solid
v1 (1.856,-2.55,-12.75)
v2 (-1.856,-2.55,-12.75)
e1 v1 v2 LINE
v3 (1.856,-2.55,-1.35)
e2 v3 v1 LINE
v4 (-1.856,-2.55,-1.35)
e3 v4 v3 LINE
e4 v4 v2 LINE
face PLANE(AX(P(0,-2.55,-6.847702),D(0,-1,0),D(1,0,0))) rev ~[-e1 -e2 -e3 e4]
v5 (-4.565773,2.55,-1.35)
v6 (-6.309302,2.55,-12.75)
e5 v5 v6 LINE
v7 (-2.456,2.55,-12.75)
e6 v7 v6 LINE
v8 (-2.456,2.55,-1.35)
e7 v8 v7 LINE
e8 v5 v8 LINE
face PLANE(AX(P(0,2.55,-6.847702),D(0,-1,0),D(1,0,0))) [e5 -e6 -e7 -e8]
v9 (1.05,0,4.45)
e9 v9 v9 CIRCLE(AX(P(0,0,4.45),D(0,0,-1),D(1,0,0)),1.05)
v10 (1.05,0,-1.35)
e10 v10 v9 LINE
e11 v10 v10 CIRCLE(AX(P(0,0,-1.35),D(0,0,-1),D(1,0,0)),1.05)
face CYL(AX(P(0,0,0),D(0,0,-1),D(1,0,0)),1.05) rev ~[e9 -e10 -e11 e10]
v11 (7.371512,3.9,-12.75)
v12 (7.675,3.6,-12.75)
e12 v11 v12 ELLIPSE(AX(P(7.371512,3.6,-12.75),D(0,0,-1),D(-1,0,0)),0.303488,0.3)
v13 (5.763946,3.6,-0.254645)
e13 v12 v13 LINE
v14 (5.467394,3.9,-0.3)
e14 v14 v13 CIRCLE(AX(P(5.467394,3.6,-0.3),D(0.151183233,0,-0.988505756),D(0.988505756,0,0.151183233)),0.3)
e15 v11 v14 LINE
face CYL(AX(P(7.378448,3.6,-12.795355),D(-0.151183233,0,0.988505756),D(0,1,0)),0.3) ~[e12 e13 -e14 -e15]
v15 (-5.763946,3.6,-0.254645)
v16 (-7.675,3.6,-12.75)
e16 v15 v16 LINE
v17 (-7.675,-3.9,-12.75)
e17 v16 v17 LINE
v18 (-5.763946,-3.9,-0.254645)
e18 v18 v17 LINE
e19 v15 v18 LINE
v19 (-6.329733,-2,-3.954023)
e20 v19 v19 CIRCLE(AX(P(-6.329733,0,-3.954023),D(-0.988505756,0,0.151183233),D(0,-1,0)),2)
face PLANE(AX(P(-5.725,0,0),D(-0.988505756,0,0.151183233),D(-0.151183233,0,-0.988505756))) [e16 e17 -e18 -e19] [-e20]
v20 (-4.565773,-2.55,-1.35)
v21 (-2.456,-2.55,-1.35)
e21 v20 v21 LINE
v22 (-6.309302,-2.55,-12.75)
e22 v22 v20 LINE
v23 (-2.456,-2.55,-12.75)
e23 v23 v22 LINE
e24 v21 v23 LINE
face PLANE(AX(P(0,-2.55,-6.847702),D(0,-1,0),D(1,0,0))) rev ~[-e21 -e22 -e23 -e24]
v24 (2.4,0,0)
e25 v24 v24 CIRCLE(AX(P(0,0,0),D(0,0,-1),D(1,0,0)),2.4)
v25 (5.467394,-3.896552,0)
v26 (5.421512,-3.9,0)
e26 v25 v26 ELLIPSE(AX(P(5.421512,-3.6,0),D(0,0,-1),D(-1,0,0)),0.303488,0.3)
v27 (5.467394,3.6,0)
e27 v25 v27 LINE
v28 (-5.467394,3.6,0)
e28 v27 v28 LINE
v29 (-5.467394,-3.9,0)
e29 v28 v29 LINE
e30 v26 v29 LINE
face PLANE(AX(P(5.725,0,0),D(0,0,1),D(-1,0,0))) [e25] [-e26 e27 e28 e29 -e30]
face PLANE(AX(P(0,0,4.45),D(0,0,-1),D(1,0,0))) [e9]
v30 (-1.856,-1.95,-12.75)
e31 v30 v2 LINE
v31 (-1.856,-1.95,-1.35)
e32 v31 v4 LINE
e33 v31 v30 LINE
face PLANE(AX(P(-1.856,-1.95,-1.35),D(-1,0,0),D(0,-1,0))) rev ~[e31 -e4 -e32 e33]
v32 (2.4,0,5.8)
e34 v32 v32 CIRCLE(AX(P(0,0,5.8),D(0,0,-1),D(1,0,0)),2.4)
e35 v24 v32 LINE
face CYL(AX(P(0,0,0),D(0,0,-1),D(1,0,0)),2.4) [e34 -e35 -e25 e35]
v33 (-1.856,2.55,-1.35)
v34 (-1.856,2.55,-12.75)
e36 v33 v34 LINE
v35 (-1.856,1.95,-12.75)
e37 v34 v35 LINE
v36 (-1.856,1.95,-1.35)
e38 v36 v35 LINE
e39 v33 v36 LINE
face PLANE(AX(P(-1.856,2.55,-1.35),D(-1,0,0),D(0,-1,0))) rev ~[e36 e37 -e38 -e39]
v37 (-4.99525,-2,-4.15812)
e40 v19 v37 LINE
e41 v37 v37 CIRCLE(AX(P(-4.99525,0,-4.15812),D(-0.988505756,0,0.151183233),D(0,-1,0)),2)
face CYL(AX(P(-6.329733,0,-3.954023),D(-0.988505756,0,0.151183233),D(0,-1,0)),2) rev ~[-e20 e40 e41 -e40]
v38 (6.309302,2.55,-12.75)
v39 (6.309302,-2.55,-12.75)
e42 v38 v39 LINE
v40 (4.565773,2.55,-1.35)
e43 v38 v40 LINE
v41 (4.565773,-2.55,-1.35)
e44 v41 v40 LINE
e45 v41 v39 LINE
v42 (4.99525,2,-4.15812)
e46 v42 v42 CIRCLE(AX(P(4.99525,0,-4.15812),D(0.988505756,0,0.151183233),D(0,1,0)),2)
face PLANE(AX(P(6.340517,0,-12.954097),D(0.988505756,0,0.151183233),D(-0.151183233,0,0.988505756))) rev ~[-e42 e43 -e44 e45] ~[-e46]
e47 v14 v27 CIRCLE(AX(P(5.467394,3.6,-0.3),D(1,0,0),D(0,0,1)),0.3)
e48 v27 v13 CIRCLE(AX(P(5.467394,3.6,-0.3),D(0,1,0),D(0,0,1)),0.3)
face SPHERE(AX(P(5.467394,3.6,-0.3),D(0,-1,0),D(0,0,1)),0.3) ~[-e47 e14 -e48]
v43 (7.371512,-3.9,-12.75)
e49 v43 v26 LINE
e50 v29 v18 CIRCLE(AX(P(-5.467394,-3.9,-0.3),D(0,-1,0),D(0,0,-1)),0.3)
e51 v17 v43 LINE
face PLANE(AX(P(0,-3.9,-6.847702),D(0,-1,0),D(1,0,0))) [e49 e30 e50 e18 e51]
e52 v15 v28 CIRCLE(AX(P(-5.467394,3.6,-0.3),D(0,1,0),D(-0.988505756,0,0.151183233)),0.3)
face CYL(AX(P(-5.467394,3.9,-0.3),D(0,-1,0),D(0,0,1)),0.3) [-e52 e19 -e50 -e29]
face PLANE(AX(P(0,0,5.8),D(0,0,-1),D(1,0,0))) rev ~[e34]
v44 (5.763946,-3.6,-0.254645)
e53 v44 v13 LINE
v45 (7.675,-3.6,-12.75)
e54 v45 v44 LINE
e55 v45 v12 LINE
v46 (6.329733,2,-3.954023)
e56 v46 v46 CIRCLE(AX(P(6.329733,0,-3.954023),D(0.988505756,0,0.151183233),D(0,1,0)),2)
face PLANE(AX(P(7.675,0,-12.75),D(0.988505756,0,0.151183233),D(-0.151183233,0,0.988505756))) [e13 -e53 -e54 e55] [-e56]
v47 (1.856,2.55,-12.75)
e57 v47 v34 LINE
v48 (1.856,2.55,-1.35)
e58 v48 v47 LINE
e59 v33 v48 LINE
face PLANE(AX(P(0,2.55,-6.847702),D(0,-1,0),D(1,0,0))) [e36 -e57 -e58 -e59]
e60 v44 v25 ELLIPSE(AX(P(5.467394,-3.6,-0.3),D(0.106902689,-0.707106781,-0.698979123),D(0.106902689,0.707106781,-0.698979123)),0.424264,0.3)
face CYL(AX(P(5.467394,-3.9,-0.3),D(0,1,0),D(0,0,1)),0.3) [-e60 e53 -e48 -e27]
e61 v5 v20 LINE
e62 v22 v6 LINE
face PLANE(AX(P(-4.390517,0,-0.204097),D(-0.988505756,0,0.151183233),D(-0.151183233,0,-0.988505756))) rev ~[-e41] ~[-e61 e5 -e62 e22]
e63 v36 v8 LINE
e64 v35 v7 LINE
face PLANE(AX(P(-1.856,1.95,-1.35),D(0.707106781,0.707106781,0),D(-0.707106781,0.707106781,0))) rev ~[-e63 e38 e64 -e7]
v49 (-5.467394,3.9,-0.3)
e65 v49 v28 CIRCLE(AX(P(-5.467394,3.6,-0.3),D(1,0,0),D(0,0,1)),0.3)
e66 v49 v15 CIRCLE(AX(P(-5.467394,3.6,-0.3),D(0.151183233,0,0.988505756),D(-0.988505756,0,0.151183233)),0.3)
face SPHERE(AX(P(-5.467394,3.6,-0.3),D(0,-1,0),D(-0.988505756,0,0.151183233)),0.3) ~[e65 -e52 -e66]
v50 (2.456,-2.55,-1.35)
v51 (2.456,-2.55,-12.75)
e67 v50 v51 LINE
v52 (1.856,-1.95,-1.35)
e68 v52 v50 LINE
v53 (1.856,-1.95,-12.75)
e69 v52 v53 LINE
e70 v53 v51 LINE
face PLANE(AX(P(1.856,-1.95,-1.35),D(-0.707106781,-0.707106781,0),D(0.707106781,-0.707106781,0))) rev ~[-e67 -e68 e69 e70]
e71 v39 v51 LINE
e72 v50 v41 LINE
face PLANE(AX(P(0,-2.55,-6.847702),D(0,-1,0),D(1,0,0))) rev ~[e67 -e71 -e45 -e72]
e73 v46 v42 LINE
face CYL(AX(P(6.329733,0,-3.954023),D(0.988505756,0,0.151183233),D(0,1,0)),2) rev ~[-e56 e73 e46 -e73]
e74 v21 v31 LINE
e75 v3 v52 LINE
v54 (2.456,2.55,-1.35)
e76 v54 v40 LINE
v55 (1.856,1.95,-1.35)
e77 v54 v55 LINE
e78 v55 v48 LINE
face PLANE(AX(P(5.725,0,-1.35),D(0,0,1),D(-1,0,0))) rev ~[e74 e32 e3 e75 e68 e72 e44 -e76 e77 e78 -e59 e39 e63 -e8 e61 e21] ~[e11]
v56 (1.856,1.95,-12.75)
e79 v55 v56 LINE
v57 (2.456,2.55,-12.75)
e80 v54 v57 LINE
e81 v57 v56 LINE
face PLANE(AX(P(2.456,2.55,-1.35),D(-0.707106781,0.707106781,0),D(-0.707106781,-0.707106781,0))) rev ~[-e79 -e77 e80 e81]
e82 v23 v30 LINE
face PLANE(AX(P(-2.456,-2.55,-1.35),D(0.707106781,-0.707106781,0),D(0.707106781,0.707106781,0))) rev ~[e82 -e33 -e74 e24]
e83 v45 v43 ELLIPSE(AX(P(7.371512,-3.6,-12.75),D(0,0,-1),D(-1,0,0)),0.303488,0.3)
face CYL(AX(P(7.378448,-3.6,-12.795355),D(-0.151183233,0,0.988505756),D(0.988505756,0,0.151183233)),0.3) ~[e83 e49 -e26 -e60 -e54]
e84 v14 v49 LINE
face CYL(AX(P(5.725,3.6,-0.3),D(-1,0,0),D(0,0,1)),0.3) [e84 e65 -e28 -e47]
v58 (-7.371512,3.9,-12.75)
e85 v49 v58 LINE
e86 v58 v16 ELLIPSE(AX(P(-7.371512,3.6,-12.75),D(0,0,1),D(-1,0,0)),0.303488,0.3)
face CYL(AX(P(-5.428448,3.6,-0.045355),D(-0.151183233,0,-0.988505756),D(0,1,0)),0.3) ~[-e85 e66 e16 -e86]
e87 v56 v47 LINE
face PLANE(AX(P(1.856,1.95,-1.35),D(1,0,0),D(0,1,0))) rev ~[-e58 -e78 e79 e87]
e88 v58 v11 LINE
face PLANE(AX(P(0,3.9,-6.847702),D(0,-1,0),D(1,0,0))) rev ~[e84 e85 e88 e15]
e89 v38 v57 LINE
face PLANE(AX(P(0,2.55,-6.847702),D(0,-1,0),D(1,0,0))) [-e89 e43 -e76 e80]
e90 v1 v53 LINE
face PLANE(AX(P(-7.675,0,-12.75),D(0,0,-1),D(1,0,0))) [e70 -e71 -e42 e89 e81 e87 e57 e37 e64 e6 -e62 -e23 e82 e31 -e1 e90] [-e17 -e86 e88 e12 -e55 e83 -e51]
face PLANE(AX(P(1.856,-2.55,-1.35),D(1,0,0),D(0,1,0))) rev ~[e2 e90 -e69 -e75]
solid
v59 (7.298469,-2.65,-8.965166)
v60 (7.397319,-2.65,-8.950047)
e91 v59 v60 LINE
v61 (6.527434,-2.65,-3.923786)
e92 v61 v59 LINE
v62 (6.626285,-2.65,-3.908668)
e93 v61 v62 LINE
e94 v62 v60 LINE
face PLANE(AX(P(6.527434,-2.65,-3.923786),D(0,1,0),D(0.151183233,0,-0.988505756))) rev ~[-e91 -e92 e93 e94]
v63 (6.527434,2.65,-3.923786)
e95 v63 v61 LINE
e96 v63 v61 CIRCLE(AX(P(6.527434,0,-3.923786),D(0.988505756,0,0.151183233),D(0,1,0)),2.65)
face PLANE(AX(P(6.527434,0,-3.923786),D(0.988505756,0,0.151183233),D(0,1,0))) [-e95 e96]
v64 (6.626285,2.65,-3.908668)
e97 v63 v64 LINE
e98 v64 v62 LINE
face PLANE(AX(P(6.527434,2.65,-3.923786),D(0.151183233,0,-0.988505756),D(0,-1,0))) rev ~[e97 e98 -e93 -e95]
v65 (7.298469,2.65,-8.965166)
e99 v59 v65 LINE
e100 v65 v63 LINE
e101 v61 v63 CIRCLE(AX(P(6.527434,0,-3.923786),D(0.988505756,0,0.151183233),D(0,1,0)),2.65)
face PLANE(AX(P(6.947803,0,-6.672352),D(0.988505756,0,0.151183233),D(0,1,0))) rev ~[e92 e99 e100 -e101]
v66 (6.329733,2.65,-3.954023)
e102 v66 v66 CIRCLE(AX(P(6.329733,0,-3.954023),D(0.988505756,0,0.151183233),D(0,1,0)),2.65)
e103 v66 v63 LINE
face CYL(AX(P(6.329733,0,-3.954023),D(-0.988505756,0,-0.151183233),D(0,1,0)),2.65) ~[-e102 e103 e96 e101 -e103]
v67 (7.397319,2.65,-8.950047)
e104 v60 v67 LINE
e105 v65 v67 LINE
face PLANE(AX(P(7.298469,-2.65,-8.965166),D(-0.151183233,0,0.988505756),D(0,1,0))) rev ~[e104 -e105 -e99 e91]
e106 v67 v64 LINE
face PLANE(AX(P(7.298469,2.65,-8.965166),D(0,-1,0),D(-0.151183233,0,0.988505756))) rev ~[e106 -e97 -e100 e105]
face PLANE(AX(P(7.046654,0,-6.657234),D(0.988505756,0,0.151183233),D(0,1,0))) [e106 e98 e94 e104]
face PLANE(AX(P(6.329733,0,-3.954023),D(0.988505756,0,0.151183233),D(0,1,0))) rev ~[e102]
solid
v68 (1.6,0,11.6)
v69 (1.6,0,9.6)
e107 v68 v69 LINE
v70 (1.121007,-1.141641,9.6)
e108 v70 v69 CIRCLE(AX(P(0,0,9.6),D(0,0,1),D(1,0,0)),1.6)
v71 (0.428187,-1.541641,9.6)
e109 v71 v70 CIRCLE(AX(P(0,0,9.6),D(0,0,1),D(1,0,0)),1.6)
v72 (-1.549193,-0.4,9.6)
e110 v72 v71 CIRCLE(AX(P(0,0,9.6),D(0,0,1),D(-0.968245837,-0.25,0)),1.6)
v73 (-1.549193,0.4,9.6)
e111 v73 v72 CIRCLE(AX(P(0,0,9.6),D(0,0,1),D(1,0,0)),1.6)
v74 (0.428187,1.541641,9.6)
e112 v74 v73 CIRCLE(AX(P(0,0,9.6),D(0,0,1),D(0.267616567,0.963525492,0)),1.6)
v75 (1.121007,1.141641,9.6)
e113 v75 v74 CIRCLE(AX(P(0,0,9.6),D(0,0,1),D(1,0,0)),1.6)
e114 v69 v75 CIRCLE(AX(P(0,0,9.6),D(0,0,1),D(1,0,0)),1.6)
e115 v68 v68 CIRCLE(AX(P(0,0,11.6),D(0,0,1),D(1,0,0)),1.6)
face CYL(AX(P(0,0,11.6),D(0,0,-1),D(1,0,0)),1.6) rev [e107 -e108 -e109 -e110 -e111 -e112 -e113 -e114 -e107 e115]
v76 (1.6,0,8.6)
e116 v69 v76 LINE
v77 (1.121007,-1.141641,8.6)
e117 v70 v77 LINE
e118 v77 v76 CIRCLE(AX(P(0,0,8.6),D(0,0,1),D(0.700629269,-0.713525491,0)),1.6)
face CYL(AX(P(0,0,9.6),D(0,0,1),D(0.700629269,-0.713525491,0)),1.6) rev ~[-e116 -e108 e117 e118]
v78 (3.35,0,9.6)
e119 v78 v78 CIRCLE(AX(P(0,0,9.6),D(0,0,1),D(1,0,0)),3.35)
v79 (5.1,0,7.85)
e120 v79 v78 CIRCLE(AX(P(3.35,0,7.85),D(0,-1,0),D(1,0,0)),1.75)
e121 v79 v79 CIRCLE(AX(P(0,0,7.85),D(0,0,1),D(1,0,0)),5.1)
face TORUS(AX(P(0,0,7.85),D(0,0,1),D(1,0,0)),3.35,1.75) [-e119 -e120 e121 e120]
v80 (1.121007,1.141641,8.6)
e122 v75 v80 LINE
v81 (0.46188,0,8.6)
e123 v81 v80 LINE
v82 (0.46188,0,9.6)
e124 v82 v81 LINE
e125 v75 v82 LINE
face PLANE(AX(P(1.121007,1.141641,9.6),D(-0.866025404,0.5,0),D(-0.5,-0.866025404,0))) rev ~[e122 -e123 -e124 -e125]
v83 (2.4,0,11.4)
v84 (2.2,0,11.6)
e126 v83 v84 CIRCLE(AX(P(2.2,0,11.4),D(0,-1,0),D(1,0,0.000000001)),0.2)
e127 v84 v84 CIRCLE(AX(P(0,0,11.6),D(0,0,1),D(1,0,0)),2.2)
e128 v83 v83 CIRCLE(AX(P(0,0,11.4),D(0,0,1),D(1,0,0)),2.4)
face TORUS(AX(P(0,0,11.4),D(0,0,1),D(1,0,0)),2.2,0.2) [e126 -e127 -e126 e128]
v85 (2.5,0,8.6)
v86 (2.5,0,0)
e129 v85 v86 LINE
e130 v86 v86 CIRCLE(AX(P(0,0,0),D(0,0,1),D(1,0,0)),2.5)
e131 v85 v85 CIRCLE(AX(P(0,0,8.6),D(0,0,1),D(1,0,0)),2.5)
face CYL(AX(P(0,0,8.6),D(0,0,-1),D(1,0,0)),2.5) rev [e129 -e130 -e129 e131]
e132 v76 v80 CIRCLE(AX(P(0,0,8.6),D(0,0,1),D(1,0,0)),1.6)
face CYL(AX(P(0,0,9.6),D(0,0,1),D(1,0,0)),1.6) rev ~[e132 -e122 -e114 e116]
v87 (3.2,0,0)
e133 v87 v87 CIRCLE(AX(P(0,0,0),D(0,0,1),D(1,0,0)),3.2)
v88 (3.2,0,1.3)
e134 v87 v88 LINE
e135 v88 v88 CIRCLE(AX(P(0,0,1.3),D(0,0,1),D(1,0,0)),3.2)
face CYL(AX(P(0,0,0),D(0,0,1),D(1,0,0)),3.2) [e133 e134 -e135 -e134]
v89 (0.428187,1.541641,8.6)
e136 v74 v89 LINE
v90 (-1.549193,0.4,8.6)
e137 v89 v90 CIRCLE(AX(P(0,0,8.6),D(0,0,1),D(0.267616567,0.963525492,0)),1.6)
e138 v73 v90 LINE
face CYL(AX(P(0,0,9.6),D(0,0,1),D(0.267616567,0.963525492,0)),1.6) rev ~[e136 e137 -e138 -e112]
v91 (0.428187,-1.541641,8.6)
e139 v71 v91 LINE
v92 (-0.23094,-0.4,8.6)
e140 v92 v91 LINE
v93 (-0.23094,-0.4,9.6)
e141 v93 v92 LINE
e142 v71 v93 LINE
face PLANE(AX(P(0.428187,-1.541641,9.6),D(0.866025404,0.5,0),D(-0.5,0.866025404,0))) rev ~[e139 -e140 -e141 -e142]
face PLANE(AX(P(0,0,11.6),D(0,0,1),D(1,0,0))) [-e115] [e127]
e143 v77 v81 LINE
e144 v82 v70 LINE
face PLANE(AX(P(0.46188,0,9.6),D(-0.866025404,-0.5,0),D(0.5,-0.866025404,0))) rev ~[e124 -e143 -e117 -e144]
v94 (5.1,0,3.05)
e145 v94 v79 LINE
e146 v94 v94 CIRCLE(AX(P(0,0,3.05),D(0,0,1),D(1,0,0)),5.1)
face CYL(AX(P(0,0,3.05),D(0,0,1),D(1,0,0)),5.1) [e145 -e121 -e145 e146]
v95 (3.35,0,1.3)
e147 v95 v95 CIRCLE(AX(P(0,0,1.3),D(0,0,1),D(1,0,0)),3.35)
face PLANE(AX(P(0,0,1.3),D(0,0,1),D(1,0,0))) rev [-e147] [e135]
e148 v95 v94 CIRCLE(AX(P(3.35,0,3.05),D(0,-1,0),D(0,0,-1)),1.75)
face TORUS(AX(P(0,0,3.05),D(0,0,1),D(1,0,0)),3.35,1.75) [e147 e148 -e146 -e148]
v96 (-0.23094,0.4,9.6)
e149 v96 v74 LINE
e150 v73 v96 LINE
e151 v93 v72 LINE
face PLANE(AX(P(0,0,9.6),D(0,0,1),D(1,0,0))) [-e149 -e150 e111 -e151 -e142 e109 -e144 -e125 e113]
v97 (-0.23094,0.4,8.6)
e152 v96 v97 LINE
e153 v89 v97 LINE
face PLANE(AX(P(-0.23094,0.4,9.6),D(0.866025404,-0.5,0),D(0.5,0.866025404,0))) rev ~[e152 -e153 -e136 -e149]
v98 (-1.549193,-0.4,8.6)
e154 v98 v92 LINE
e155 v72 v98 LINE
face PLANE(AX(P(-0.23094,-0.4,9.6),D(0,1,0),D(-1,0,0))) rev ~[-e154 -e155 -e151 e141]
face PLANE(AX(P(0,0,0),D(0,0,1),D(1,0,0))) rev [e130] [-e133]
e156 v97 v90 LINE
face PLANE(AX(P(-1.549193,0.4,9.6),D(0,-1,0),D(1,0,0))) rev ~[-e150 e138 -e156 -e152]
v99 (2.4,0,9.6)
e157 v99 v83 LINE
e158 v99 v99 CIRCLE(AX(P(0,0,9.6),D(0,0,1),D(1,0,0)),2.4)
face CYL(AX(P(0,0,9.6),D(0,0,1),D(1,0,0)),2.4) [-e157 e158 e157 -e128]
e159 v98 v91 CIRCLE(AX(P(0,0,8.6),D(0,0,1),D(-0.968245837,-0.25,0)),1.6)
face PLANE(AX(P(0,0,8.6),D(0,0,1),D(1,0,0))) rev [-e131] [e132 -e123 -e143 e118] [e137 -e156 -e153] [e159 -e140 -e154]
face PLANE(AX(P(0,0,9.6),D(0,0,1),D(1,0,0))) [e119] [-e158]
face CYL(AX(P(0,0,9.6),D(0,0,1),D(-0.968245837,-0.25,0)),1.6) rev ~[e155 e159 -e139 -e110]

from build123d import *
from build123d import SkipClean  # not in build123d's __all__

# Parameters (mm, degrees)
F3_DEPTH  = 25
F4_R      = 2.4
F5_DEPTH  = 5.8
F7_DEPTH  = 3.9
F8_T      = -1.35
F10_DEPTH = 11.4
F12_R     = 2
F13_DEPTH = 1.35
F11_R     = 2
F14_DEPTH = 1.35
F15_R     = 0.3
F16_R     = 2.65
F16_R_2   = 2
F17_DEPTH = 0.2
F19_DEPTH = 0.1


with BuildPart() as f1:
    # F0 (on Front) → F1 (revolve)
    with BuildSketch(Plane.XZ):
        with BuildLine():
            Line((2.5, 0), (3.2, 0))
            Line((3.2, 0), (3.2, 1.3))
            Line((3.2, 1.3), (3.35, 1.3))
            ThreePointArc((3.35, 1.3), (4.5874368671, 1.8125631329), (5.1, 3.05))
            Line((5.1, 3.05), (5.1, 7.85))
            ThreePointArc((5.1, 7.85), (4.5874368671, 9.0874368671), (3.35, 9.6))
            Line((3.35, 9.6), (2.4, 9.6))
            Line((2.4, 9.6), (2.4, 11.4))
            ThreePointArc((2.4, 11.4), (2.3414213562, 11.5414213562), (2.2, 11.6))
            Line((2.2, 11.6), (1.6, 11.6))
            Line((1.6, 11.6), (1.6, 9.6))
            Line((1.6, 9.6), (0, 9.6))
            Line((0, 9.6), (0, 8.6))
            Line((0, 8.6), (2.5, 8.6))
            Line((2.5, 8.6), (2.5, 0))
        make_face()
    revolve(axis=Axis((0, 0, 5.8), (0, 0, 1)))

    # F2 (on face) → F3 (cut)
    with BuildSketch(Plane.XY.offset(9.6)):
        with BuildLine():
            Line((-1.5491933385, 0.4), (-0.2309401077, 0.4))
            Line((-0.2309401077, 0.4), (0.4281865077, 1.5416407865))
            ThreePointArc((0.4281865077, 1.5416407865), (-0.8, 1.3856406461), (-1.5491933385, 0.4))
        make_face()
        with BuildLine():
            Line((1.1210068308, 1.1416407865), (0.4618802154, 0))
            Line((0.4618802154, 0), (1.1210068308, -1.1416407865))
            ThreePointArc((1.1210068308, -1.1416407865), (1.4754001032, -0.6190270878), (1.6, 0))
            ThreePointArc((1.6, 0), (1.4754001032, 0.6190270878), (1.1210068308, 1.1416407865))
        make_face()
        with BuildLine():
            Line((0.4281865077, -1.5416407865), (-0.2309401077, -0.4))
            Line((-0.2309401077, -0.4), (-1.5491933385, -0.4))
            ThreePointArc((-1.5491933385, -0.4), (-0.8, -1.3856406461), (0.4281865077, -1.5416407865))
        make_face()
    with SkipClean():  # cleaning this boolean's faces spoils the solid; the shape is the same uncleaned
        extrude(amount=-F3_DEPTH, mode=Mode.SUBTRACT)


with BuildPart() as f5:
    # F4 (on face) → F5 (new body)
    with BuildSketch(Plane(origin=(0, 0, 0), x_dir=(1, 0, 0), z_dir=(0, 0, -1))):
        Circle(F4_R)
    extrude(amount=-F5_DEPTH)

    # F6 (on Front) → F7 (join, symmetric)
    with BuildSketch(Plane.XZ):
        Polygon((5.725, 0), (-5.725, 0), (-7.675, -12.75), (7.675, -12.75), align=None)
    extrude(amount=F7_DEPTH, both=True)

    # F8
    f8_openings = [f5.faces().sort_by_distance(p)[0] for p in [
        (0, 0, -12.75),
    ]]
    offset(amount=F8_T, openings=f8_openings, kind=Kind.INTERSECTION)

    # F9 (on face) → F10 (join, through all)
    with BuildSketch(Plane(origin=(0, 0, -1.35), x_dir=(1, 0, 0), z_dir=(0, 0, -1))):
        Polygon((-1.856, 1.95), (-1.856, 2.55), (-2.456, 2.55), align=None)
        Polygon((2.456, 2.55), (1.856, 2.55), (1.856, 1.95), align=None)
        Polygon((-1.856, -1.95), (-2.456, -2.55), (-1.856, -2.55), align=None)
        Polygon((1.856, -2.55), (2.456, -2.55), (1.856, -1.95), align=None)
    extrude(amount=F10_DEPTH)

    # F12 (on face) → F13 (cut)
    with BuildSketch(Plane(origin=(-5.5941472816, 0, 0.8555754666), x_dir=(0, -1, 0), z_dir=(-0.9885057562, 0, 0.1511832333))):
        with Locations((0, -4.8655240106)):
            Circle(F12_R)
    extrude(amount=-F13_DEPTH, mode=Mode.SUBTRACT)

    # F11 (on face) → F14 (cut)
    with BuildSketch(Plane(origin=(5.5941472816, 0, 0.8555754666), x_dir=(0, 1, 0), z_dir=(0.9885057562, 0, 0.1511832333))):
        with Locations((0, -4.8655240106)):
            Circle(F11_R)
    extrude(amount=-F14_DEPTH, mode=Mode.SUBTRACT)

    # F15
    f15_edges = [f5.edges().sort_by_distance(p)[0] for p in [
        (-6.7, 3.9, -6.375),
        (0, 3.9, 0),
        (-5.725, 0, 0),
        (6.7, 3.9, -6.375),
        (5.725, 0, 0),
        (6.7, -3.9, -6.375),
    ]]
    fillet(f15_edges, radius=F15_R)


with BuildPart() as f17:
    # F16 (on face) → F17 (new body)
    with BuildSketch(Plane(origin=(5.5941472816, 0, 0.8555754666), x_dir=(0, 1, 0), z_dir=(0.9885057562, 0, 0.1511832333))):
        with Locations((0, -4.8655240106)):
            Circle(F16_R)
        with Locations((0, -4.8655240106)):
            Circle(F16_R_2, mode=Mode.SUBTRACT)
        with Locations((0, -4.8655240106)):
            Circle(F16_R_2)
    extrude(amount=F17_DEPTH)

    # F18 (on face) → F19 (join)
    with BuildSketch(Plane(origin=(5.7918484328, 0, 0.8858121133), x_dir=(0, 1, 0), z_dir=(0.9885057562, 0, 0.1511832333))):
        with BuildLine():
            Line((2.65, -9.9655240106), (2.65, -4.8655240106))
            ThreePointArc((2.65, -4.8655240106), (0, -7.5155240106), (-2.65, -4.8655240106))
            Line((-2.65, -4.8655240106), (-2.65, -9.9655240106))
            Line((-2.65, -9.9655240106), (2.65, -9.9655240106))
        make_face()
        with BuildLine():
            ThreePointArc((-2.65, -4.8655240106), (0, -7.5155240106), (2.65, -4.8655240106))
            Line((2.65, -4.8655240106), (0, -4.8655240106))
            Line((0, -4.8655240106), (-2.65, -4.8655240106))
        make_face()
    extrude(amount=F19_DEPTH)


solid = Compound([f1.part, f5.part, f17.part])
